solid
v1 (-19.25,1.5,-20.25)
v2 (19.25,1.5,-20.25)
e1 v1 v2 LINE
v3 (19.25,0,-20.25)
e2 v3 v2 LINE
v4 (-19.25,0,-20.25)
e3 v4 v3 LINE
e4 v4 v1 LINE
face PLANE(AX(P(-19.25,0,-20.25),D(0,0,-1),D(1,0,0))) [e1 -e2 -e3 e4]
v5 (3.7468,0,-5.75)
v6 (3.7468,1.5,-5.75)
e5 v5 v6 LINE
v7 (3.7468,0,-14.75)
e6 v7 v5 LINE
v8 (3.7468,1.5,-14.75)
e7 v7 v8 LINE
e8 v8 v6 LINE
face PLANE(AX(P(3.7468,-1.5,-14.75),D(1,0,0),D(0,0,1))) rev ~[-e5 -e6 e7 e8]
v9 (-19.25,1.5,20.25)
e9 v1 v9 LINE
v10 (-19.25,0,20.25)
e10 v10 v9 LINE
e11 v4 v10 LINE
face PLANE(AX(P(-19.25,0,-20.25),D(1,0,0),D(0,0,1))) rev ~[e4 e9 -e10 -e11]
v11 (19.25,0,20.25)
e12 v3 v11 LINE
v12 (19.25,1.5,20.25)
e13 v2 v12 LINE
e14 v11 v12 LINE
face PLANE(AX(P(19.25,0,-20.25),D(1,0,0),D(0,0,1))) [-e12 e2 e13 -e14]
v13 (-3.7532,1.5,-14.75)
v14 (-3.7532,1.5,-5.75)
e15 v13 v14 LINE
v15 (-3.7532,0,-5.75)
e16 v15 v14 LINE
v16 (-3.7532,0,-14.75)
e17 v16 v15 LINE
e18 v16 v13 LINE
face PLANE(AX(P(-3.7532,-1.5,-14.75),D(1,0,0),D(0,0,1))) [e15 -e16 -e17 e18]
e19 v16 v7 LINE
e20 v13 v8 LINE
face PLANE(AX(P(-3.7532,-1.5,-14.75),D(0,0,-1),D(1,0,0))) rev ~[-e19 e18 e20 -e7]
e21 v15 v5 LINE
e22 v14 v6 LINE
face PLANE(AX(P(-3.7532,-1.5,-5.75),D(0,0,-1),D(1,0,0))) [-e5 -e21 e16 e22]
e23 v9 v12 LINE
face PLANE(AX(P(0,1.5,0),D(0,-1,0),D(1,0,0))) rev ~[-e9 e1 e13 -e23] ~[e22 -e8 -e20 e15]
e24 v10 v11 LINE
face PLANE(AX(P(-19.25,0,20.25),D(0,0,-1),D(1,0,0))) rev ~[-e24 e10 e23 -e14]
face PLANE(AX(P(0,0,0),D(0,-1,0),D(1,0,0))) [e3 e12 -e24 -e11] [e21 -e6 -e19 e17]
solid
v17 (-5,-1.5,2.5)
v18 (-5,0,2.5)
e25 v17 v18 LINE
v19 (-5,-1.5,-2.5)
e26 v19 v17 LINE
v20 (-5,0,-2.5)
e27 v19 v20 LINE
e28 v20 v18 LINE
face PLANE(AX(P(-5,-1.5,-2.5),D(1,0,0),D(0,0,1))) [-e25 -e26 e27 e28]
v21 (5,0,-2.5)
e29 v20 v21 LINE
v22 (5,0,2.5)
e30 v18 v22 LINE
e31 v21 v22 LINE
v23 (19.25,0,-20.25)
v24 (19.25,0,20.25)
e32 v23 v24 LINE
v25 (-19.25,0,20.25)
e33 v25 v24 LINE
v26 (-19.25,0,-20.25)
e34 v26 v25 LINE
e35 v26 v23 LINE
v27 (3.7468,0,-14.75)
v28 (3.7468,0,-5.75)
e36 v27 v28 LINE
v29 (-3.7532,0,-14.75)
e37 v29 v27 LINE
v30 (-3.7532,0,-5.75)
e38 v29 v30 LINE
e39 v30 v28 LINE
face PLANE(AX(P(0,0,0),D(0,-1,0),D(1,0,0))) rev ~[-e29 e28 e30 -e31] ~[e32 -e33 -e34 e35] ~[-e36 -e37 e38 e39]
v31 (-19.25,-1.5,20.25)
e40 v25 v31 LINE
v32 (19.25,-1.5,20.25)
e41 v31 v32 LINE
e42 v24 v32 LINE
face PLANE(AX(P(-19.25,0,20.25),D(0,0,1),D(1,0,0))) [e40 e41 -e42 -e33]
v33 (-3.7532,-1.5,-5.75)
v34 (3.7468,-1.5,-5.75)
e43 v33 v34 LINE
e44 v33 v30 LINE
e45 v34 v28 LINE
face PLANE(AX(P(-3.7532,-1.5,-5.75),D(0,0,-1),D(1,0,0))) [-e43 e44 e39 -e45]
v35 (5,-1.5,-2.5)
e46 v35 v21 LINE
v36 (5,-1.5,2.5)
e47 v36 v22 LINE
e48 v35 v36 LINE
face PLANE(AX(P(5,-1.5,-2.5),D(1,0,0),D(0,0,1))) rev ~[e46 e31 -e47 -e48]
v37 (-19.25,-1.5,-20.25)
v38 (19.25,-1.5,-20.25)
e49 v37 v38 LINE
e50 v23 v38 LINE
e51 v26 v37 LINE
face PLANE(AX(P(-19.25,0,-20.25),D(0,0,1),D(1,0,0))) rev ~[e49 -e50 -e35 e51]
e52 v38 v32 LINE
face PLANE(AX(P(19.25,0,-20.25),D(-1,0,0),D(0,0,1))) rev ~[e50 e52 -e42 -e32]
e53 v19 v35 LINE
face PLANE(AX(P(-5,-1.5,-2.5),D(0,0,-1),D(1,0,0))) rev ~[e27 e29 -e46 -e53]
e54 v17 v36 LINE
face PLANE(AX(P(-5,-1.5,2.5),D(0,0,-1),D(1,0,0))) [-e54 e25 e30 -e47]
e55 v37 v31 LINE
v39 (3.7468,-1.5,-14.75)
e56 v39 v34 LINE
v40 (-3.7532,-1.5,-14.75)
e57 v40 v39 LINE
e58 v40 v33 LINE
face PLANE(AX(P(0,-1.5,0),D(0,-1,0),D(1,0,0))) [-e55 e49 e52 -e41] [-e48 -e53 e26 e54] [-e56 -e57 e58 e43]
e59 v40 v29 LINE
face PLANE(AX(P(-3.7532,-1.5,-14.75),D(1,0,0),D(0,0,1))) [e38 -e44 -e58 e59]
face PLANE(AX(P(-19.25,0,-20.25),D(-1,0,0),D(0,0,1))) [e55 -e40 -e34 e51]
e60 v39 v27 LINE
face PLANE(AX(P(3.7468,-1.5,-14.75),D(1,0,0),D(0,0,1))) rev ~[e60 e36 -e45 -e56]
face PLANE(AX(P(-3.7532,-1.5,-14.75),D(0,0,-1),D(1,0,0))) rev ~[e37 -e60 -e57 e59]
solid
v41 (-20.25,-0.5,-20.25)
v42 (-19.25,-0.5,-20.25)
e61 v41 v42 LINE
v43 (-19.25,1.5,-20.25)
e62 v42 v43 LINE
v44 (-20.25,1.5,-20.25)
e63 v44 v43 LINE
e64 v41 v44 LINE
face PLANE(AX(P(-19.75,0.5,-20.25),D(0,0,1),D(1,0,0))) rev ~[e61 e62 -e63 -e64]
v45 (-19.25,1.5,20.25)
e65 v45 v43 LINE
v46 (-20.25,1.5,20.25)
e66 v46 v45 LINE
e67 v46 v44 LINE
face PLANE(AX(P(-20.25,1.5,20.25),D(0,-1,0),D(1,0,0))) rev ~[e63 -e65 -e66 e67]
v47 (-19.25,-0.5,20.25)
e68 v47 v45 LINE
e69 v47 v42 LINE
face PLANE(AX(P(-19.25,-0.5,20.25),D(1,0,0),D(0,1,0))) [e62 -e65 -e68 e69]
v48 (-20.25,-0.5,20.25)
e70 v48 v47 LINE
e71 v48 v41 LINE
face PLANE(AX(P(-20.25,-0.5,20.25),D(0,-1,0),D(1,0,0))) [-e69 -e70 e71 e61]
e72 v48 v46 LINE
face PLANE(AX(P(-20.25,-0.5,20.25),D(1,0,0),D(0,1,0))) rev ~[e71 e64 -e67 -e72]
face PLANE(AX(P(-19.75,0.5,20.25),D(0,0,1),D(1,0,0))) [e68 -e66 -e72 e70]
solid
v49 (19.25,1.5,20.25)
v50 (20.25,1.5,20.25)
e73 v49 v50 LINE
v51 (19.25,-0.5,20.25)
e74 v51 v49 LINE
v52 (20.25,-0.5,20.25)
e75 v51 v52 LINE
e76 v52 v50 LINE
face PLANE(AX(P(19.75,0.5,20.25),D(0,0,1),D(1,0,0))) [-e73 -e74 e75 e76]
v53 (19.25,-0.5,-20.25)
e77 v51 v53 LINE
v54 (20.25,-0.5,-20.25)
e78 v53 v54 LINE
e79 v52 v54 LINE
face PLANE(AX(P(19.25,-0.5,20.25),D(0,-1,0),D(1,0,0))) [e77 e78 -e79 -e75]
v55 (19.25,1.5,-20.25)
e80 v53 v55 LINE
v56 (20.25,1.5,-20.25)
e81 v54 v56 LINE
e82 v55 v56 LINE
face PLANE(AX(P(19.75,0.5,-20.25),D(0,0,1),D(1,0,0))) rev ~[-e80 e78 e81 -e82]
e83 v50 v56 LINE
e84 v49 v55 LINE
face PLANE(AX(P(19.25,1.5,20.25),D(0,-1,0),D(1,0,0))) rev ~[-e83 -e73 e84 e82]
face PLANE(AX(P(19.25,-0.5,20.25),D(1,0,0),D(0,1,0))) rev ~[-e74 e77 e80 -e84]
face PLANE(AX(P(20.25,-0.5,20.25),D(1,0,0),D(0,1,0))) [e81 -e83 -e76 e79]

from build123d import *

# Parameters (mm, degrees)
F2_W      = 1
F2_H      = 2
F3_DEPTH  = 40.5
F0_W      = 38.5
F0_H      = 40.5
F4_DEPTH  = 1.5
F5_DEPTH  = 1.5
F7_W      = 10
F7_H      = 5
F8_DEPTH  = 2
F9_W      = 7.5
F9_H      = 9
F10_DEPTH = 76.2
F12_W     = 7.5
F12_H     = 9
F13_DEPTH = 3


with BuildPart() as f3:
    # F2 (on line) → F3 (new body)
    with BuildSketch(Plane.XY.offset(20.25)):
        with Locations((-19.75, 0.5)):
            Rectangle(F2_W, F2_H)
    extrude(amount=-F3_DEPTH)

    # F12 (on offset) → F13 (cut)
    with BuildSketch(Plane(origin=(0, 1.5, 0), x_dir=(-1, 0, 0), z_dir=(0, 1, 0))):
        with Locations((0.0032, -10.25)):
            Rectangle(F12_W, F12_H)
    extrude(amount=-F13_DEPTH, mode=Mode.SUBTRACT)


with BuildPart() as f3b:
    # F2 (on line) → F3, piece 2 (new body)
    with BuildSketch(Plane.XY.offset(20.25)):
        with Locations((19.75, 0.5)):
            Rectangle(F2_W, F2_H)
    extrude(amount=-F3_DEPTH)


with BuildPart() as f4:
    # F0 (on Front) → F4 (new body)
    with BuildSketch(Plane.XZ):
        Rectangle(F0_W, F0_H)
    extrude(amount=-F4_DEPTH)


with BuildPart() as f5:
    # F5 (new): a face of the model
    f5_faces = [f4.part.faces().sort_by_distance(p)[0] for p in [
        (0, 0, 0),
    ]]
    extrude(f5_faces, amount=F5_DEPTH)

    # F7 (on offset) → F8 (cut)
    with BuildSketch(Plane.XZ.offset(1.5)):
        Rectangle(F7_W, F7_H)
    extrude(amount=-F8_DEPTH, mode=Mode.SUBTRACT)


with BuildPart() as f10_tool:
    # F9 (on offset) → F10 (new body)
    with BuildSketch(Plane.XZ.offset(1.5)):
        with Locations((-0.0032, -10.25)):
            Rectangle(F9_W, F9_H)
    extrude(amount=-F10_DEPTH)


with BuildPart() as f4_1:
    add(f4.part)

    # F10: cut by f10_tool
    add(f10_tool.part, mode=Mode.SUBTRACT)


with BuildPart() as f5_1:
    add(f5.part)

    # F10: cut by f10_tool
    add(f10_tool.part, mode=Mode.SUBTRACT)


solid = Compound([f3.part, f3b.part, f4_1.part, f5_1.part])
